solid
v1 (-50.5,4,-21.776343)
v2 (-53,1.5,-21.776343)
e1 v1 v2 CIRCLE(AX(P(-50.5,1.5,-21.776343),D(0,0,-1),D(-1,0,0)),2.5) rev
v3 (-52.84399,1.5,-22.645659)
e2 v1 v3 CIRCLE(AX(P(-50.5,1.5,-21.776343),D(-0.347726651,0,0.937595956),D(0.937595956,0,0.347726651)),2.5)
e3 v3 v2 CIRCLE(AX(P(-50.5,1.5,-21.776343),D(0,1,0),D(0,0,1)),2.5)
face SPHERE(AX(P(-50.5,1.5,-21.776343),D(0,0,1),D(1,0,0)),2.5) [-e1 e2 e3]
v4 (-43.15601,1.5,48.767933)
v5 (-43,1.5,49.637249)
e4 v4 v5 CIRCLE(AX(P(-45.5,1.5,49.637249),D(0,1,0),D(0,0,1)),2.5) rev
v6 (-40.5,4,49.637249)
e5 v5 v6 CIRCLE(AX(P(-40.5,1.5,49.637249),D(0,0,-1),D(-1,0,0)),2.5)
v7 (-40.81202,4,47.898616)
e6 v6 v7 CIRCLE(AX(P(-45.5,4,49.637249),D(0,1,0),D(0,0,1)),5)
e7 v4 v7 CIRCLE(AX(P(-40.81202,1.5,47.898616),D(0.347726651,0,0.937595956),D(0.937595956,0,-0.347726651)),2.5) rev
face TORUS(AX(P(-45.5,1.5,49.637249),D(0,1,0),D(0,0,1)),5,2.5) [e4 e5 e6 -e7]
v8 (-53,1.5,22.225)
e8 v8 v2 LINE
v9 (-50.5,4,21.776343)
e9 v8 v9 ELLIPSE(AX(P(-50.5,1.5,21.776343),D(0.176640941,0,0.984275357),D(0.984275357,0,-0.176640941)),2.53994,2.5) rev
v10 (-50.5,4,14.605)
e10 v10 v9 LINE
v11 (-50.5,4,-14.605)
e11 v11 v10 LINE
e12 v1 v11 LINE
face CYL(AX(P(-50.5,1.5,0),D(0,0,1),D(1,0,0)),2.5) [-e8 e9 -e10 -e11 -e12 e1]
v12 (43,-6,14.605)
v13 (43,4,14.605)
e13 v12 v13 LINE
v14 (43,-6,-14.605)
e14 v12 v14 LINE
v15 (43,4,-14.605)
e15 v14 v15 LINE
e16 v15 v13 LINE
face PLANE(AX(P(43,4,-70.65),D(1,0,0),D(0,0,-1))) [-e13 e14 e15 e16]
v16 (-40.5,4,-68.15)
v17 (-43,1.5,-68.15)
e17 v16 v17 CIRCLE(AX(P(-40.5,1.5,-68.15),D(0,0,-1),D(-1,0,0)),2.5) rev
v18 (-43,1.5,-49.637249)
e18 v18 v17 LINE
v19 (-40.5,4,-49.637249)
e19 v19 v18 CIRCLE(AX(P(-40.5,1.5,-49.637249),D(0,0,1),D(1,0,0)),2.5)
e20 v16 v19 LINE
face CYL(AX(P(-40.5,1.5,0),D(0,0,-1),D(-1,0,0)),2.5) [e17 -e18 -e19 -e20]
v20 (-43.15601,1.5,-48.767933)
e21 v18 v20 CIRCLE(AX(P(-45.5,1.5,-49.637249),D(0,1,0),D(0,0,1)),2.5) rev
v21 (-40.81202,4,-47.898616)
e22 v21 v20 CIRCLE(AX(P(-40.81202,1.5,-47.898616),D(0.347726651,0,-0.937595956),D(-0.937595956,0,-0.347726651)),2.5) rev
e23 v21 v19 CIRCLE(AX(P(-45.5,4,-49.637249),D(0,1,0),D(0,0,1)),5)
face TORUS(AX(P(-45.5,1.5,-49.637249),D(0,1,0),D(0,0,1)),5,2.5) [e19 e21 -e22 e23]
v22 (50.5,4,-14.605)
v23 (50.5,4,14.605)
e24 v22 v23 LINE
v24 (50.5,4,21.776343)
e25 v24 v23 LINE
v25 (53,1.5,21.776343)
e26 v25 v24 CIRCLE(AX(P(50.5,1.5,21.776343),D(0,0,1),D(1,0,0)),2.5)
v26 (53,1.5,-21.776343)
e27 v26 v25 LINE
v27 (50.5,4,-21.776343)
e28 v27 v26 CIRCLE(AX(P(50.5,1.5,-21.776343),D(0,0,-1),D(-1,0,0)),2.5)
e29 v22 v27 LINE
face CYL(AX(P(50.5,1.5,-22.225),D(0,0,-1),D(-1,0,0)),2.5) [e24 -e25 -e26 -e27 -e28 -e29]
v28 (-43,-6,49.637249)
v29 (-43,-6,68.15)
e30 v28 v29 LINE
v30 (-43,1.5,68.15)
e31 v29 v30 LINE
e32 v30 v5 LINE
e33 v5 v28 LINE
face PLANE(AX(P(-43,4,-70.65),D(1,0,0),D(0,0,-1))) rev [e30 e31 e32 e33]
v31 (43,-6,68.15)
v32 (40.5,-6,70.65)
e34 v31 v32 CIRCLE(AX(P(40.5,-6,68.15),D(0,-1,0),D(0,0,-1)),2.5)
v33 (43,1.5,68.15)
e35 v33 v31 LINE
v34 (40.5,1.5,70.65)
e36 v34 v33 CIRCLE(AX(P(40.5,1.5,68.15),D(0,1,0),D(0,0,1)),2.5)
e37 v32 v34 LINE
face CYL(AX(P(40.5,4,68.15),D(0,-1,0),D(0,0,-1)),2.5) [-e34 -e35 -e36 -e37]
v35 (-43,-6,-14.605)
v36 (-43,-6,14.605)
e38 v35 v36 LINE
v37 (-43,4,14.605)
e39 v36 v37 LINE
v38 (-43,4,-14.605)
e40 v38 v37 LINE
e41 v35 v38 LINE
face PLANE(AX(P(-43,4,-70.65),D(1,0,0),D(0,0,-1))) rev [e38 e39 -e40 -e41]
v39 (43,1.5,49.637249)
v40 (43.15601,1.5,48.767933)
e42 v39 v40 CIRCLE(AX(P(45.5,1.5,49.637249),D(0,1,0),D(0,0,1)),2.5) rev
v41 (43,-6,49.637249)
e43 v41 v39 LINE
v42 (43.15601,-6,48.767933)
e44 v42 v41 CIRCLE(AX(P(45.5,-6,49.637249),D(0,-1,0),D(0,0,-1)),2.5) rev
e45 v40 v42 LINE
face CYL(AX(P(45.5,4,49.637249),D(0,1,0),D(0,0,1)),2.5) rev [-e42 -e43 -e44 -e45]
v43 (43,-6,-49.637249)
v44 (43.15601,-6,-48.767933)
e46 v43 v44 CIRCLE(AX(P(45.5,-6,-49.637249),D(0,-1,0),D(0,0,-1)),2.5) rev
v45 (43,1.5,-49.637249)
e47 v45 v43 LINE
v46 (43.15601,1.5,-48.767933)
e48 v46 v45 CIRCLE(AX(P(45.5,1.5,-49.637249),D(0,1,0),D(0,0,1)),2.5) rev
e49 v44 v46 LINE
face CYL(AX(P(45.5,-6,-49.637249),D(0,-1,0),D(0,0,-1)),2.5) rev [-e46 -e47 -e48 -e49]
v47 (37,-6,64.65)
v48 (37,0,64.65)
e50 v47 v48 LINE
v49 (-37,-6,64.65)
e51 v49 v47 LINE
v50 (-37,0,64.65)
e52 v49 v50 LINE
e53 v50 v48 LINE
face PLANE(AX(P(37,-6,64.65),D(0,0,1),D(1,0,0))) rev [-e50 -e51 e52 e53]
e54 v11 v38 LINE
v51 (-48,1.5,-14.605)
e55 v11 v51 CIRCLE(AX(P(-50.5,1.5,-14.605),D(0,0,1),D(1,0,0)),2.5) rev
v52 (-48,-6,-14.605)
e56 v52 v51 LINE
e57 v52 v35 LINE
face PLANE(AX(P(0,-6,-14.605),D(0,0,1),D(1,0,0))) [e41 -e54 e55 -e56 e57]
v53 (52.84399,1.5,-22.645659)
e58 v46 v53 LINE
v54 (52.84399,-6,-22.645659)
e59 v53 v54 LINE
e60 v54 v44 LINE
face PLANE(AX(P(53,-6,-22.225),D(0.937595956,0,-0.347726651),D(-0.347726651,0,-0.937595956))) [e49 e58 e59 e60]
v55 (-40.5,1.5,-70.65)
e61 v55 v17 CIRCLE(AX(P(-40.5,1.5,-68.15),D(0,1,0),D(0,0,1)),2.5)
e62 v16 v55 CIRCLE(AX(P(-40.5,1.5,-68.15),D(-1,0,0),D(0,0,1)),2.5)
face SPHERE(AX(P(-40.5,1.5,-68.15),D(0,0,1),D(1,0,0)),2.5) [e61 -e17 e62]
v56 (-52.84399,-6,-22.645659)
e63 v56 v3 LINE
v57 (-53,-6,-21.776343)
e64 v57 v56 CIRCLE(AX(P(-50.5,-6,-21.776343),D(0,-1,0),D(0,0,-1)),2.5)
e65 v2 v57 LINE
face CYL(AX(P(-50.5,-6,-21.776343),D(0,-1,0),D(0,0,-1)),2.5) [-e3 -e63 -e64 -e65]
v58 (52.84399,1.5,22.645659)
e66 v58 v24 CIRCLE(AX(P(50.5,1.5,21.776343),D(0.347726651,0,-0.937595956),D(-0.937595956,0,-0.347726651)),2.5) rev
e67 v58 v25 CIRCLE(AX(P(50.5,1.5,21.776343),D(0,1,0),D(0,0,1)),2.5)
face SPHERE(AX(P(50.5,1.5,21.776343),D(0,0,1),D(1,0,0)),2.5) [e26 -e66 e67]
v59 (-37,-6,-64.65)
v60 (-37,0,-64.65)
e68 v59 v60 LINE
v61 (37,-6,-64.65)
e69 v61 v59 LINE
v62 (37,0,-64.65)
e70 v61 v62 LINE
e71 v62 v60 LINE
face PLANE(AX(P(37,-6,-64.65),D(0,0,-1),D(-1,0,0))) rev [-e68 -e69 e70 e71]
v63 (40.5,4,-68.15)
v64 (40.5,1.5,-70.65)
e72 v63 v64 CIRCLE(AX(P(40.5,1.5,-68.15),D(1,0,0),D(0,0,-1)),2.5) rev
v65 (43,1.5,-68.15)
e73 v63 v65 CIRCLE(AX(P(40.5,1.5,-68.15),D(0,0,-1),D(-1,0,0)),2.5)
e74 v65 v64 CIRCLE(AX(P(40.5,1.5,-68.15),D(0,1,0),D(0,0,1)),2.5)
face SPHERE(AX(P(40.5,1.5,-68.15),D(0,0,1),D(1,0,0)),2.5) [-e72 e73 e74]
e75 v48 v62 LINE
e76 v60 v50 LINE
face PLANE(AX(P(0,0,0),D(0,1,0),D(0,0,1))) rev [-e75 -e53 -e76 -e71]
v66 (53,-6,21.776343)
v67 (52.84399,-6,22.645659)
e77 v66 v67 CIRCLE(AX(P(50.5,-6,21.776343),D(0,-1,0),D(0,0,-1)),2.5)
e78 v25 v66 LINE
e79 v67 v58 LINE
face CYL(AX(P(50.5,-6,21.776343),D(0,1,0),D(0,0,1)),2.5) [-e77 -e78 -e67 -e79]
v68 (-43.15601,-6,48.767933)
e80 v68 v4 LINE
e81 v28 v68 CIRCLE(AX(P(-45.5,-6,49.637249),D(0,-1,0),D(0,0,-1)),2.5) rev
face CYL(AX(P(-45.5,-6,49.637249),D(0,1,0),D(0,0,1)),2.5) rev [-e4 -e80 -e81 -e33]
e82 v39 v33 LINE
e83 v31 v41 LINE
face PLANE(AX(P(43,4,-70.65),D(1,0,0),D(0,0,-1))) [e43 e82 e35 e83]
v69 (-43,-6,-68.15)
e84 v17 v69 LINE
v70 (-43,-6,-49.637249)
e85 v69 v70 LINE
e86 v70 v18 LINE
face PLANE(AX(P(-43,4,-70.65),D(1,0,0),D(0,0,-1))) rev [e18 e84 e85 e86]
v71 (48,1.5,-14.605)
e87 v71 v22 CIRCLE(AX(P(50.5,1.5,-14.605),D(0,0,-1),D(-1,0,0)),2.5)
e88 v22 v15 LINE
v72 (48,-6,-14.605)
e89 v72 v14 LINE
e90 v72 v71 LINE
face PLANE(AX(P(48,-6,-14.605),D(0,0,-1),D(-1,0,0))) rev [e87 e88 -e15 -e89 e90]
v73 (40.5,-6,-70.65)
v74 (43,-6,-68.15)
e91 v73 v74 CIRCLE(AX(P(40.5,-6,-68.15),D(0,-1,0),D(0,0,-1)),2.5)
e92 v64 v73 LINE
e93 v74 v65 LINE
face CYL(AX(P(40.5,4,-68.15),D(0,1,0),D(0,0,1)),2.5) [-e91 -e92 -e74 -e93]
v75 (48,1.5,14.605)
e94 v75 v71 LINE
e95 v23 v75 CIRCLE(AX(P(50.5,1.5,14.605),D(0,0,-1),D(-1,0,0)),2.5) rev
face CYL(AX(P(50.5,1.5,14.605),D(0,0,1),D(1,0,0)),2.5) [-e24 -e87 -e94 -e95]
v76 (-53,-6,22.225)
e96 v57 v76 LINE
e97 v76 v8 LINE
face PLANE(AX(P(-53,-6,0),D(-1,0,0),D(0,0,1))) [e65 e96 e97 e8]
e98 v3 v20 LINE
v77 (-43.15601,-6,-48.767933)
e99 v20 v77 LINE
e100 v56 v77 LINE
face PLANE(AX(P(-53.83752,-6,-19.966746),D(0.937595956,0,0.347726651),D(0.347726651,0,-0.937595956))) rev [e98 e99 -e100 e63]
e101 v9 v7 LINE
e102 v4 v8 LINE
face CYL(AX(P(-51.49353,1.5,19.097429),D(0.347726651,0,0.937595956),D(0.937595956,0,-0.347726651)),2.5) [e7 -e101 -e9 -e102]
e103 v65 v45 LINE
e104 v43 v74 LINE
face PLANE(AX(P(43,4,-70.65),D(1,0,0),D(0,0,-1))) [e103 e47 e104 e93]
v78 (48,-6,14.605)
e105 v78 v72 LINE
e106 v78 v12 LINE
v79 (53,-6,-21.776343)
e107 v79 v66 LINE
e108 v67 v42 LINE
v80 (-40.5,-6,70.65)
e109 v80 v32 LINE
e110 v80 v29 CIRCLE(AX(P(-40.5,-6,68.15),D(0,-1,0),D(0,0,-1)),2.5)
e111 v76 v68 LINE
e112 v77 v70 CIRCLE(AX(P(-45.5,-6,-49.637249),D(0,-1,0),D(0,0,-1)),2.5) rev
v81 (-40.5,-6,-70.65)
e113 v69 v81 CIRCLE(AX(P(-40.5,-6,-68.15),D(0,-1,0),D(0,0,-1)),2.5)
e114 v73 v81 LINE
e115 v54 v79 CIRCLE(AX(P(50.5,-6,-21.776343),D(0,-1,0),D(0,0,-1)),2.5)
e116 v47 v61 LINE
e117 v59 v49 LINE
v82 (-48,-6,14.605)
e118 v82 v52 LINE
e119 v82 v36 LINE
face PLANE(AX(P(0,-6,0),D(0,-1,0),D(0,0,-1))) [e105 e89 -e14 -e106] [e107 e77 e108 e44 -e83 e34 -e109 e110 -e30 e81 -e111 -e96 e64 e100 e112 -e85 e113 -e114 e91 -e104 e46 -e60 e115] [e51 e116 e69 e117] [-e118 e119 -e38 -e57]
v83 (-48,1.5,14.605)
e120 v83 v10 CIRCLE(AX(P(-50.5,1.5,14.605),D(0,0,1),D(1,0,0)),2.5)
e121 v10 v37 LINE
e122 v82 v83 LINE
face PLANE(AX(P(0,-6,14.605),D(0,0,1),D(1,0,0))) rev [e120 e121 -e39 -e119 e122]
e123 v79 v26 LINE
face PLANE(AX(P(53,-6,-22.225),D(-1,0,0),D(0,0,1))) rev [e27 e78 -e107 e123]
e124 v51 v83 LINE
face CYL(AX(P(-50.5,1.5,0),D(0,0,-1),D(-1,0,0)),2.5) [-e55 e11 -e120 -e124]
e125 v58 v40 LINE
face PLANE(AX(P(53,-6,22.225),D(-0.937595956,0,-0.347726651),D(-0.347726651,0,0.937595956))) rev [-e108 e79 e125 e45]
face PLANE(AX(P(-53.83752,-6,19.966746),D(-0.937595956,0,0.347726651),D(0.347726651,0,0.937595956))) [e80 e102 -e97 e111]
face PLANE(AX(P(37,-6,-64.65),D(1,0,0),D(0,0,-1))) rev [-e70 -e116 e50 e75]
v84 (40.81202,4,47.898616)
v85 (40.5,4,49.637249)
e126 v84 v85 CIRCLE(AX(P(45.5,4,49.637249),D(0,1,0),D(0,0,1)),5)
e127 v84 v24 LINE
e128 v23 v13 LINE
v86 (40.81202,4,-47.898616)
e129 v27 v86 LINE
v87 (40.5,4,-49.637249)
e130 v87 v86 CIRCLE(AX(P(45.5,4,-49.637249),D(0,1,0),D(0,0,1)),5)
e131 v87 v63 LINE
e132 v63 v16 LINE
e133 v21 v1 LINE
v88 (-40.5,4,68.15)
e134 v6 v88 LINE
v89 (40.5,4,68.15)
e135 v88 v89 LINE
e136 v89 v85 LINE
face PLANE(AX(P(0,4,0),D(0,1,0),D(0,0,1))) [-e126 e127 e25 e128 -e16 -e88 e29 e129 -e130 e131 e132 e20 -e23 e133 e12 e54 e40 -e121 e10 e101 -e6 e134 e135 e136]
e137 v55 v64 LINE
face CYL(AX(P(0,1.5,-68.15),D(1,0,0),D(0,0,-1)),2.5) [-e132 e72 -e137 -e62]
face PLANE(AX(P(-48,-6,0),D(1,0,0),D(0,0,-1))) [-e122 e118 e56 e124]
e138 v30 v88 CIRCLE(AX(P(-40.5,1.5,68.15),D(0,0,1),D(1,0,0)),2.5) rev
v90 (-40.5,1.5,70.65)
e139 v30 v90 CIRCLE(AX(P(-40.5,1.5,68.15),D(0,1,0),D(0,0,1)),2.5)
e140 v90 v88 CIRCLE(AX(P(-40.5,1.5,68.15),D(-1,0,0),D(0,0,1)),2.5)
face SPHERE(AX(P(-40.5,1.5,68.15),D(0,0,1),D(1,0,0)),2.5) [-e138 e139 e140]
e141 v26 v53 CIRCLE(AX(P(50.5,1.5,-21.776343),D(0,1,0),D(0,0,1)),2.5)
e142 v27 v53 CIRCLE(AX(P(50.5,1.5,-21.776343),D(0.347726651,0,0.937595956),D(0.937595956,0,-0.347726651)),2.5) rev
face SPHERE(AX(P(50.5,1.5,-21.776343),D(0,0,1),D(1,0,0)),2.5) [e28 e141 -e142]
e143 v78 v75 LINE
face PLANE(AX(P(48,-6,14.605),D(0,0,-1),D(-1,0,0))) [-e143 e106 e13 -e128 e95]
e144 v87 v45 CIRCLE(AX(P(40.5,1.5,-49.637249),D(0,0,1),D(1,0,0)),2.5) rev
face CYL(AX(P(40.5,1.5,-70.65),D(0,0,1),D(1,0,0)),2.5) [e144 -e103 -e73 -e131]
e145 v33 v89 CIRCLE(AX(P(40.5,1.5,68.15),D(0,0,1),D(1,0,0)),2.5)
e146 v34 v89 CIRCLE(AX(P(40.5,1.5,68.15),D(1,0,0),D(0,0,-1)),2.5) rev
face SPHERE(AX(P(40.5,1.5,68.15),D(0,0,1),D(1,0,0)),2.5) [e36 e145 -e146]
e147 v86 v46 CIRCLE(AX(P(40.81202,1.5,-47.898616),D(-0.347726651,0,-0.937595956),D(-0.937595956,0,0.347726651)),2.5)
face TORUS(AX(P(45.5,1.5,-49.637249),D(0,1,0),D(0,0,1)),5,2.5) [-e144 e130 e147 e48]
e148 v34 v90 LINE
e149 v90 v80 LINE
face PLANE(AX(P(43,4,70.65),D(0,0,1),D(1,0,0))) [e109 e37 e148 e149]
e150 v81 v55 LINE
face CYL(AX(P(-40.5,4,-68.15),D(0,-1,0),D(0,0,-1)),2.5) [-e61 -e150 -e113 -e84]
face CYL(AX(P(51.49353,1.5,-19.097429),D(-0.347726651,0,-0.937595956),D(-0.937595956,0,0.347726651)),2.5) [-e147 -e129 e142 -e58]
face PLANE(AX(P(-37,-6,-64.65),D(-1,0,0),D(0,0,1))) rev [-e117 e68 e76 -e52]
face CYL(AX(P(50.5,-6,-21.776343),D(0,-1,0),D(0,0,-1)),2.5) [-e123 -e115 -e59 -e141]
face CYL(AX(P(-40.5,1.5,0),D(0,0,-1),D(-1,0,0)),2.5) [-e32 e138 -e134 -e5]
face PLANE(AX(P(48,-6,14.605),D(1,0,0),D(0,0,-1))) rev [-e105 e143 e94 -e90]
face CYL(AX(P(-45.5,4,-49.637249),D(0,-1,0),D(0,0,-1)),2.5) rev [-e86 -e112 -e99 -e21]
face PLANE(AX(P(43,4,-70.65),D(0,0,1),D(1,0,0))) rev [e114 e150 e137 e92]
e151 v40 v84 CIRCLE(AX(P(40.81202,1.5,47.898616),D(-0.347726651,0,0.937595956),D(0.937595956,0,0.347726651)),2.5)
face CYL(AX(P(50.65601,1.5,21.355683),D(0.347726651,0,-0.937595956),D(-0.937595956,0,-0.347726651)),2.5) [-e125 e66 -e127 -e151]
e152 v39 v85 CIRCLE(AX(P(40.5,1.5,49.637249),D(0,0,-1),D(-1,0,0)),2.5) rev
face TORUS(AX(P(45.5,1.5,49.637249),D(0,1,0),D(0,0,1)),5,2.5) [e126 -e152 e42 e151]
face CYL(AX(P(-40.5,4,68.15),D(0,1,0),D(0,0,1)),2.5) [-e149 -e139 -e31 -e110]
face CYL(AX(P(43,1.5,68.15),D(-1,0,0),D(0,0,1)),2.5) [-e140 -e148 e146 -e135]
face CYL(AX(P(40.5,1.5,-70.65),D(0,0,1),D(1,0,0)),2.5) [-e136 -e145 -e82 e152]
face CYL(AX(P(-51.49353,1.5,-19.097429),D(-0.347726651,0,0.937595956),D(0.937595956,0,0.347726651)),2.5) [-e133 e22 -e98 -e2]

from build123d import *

# Parameters (mm, degrees)
SKETCH1_W           = 86
SKETCH1_H           = 141.3
BOSS_EXTRUDE1_DEPTH = 4
SKETCH1_3_W         = 86
SKETCH1_3_H         = 141.3
SKETCH1_3_W_2       = 74
SKETCH1_3_H_2       = 129.3
BOSS_EXTRUDE2_DEPTH = 6
BOSS_EXTRUDE3_DEPTH = 10
FILLET2_R           = 2.5


with BuildPart() as part:
    # Sketch1 → Boss-Extrude1 (new body)
    with BuildSketch(Plane(origin=(0, 0, 0), x_dir=(1, 0, 0), z_dir=(0, 1, 0))):
        Rectangle(SKETCH1_W, SKETCH1_H)
    extrude(amount=BOSS_EXTRUDE1_DEPTH)

    # Sketch1<3> → Boss-Extrude2 (add)
    with BuildSketch(Plane(origin=(0, 0, 0), x_dir=(1, 0, 0), z_dir=(0, 1, 0))):
        Rectangle(SKETCH1_3_W, SKETCH1_3_H)
        Rectangle(SKETCH1_3_W_2, SKETCH1_3_H_2, mode=Mode.SUBTRACT)
    extrude(amount=-BOSS_EXTRUDE2_DEPTH)

    # Sketch2 → Boss-Extrude3 (add)
    with BuildSketch(Plane(origin=(0, 4, 0), x_dir=(1, 0, 0), z_dir=(0, 1, 0))):
        Polygon((-43, 49.188592066), (-53, 22.225), (-53, -22.225), (-43, -49.188592066), (-43, -22.225), (-43, -14.605), (-48, -14.605), (-48, 14.605), (-43, 14.605), (-43, 22.225), align=None)
        Polygon((53, 22.225), (43, 22.225), (43, 14.605), (48, 14.605), (48, -14.605), (43, -14.605), (43, -22.225), (43, -49.188592066), (53, -22.225), align=None)
        Polygon((43, 49.188592066), (43, 22.225), (53, 22.225), align=None)
    extrude(amount=-BOSS_EXTRUDE3_DEPTH)

    # Fillet2
    fillet2_edges = [part.edges().sort_by_distance(p)[0] for p in [
        (0, 4, 70.65),
        (43, 4, -59.919296033),
        (-43, 4, 59.919296033),
        (0, 4, -70.65),
        (-48, 4, -35.706796033),
        (-53, -1, -22.225),
        (-43, -1, -49.188592066),
        (-43, -1, 49.188592066),
        (-53, 4, 0),
        (-48, 4, 35.706796033),
        (-48, 4, 0),
        (43, 4, 59.919296033),
        (43, -1, -49.188592066),
        (53, 4, 0),
        (53, -1, -22.225),
        (48, 4, 35.706796033),
        (53, -1, 22.225),
        (43, -1, 49.188592066),
        (48, 4, 0),
        (-43, 4, -59.919296033),
        (48, 4, -35.706796033),
        (43, -1, -70.65),
        (43, -1, 70.65),
        (-43, -1, 70.65),
        (-43, -1, -70.65),
    ]]
    fillet(fillet2_edges, radius=FILLET2_R - 0.0001)  # a hair under: the kernel refuses the full size


solid = part.part
